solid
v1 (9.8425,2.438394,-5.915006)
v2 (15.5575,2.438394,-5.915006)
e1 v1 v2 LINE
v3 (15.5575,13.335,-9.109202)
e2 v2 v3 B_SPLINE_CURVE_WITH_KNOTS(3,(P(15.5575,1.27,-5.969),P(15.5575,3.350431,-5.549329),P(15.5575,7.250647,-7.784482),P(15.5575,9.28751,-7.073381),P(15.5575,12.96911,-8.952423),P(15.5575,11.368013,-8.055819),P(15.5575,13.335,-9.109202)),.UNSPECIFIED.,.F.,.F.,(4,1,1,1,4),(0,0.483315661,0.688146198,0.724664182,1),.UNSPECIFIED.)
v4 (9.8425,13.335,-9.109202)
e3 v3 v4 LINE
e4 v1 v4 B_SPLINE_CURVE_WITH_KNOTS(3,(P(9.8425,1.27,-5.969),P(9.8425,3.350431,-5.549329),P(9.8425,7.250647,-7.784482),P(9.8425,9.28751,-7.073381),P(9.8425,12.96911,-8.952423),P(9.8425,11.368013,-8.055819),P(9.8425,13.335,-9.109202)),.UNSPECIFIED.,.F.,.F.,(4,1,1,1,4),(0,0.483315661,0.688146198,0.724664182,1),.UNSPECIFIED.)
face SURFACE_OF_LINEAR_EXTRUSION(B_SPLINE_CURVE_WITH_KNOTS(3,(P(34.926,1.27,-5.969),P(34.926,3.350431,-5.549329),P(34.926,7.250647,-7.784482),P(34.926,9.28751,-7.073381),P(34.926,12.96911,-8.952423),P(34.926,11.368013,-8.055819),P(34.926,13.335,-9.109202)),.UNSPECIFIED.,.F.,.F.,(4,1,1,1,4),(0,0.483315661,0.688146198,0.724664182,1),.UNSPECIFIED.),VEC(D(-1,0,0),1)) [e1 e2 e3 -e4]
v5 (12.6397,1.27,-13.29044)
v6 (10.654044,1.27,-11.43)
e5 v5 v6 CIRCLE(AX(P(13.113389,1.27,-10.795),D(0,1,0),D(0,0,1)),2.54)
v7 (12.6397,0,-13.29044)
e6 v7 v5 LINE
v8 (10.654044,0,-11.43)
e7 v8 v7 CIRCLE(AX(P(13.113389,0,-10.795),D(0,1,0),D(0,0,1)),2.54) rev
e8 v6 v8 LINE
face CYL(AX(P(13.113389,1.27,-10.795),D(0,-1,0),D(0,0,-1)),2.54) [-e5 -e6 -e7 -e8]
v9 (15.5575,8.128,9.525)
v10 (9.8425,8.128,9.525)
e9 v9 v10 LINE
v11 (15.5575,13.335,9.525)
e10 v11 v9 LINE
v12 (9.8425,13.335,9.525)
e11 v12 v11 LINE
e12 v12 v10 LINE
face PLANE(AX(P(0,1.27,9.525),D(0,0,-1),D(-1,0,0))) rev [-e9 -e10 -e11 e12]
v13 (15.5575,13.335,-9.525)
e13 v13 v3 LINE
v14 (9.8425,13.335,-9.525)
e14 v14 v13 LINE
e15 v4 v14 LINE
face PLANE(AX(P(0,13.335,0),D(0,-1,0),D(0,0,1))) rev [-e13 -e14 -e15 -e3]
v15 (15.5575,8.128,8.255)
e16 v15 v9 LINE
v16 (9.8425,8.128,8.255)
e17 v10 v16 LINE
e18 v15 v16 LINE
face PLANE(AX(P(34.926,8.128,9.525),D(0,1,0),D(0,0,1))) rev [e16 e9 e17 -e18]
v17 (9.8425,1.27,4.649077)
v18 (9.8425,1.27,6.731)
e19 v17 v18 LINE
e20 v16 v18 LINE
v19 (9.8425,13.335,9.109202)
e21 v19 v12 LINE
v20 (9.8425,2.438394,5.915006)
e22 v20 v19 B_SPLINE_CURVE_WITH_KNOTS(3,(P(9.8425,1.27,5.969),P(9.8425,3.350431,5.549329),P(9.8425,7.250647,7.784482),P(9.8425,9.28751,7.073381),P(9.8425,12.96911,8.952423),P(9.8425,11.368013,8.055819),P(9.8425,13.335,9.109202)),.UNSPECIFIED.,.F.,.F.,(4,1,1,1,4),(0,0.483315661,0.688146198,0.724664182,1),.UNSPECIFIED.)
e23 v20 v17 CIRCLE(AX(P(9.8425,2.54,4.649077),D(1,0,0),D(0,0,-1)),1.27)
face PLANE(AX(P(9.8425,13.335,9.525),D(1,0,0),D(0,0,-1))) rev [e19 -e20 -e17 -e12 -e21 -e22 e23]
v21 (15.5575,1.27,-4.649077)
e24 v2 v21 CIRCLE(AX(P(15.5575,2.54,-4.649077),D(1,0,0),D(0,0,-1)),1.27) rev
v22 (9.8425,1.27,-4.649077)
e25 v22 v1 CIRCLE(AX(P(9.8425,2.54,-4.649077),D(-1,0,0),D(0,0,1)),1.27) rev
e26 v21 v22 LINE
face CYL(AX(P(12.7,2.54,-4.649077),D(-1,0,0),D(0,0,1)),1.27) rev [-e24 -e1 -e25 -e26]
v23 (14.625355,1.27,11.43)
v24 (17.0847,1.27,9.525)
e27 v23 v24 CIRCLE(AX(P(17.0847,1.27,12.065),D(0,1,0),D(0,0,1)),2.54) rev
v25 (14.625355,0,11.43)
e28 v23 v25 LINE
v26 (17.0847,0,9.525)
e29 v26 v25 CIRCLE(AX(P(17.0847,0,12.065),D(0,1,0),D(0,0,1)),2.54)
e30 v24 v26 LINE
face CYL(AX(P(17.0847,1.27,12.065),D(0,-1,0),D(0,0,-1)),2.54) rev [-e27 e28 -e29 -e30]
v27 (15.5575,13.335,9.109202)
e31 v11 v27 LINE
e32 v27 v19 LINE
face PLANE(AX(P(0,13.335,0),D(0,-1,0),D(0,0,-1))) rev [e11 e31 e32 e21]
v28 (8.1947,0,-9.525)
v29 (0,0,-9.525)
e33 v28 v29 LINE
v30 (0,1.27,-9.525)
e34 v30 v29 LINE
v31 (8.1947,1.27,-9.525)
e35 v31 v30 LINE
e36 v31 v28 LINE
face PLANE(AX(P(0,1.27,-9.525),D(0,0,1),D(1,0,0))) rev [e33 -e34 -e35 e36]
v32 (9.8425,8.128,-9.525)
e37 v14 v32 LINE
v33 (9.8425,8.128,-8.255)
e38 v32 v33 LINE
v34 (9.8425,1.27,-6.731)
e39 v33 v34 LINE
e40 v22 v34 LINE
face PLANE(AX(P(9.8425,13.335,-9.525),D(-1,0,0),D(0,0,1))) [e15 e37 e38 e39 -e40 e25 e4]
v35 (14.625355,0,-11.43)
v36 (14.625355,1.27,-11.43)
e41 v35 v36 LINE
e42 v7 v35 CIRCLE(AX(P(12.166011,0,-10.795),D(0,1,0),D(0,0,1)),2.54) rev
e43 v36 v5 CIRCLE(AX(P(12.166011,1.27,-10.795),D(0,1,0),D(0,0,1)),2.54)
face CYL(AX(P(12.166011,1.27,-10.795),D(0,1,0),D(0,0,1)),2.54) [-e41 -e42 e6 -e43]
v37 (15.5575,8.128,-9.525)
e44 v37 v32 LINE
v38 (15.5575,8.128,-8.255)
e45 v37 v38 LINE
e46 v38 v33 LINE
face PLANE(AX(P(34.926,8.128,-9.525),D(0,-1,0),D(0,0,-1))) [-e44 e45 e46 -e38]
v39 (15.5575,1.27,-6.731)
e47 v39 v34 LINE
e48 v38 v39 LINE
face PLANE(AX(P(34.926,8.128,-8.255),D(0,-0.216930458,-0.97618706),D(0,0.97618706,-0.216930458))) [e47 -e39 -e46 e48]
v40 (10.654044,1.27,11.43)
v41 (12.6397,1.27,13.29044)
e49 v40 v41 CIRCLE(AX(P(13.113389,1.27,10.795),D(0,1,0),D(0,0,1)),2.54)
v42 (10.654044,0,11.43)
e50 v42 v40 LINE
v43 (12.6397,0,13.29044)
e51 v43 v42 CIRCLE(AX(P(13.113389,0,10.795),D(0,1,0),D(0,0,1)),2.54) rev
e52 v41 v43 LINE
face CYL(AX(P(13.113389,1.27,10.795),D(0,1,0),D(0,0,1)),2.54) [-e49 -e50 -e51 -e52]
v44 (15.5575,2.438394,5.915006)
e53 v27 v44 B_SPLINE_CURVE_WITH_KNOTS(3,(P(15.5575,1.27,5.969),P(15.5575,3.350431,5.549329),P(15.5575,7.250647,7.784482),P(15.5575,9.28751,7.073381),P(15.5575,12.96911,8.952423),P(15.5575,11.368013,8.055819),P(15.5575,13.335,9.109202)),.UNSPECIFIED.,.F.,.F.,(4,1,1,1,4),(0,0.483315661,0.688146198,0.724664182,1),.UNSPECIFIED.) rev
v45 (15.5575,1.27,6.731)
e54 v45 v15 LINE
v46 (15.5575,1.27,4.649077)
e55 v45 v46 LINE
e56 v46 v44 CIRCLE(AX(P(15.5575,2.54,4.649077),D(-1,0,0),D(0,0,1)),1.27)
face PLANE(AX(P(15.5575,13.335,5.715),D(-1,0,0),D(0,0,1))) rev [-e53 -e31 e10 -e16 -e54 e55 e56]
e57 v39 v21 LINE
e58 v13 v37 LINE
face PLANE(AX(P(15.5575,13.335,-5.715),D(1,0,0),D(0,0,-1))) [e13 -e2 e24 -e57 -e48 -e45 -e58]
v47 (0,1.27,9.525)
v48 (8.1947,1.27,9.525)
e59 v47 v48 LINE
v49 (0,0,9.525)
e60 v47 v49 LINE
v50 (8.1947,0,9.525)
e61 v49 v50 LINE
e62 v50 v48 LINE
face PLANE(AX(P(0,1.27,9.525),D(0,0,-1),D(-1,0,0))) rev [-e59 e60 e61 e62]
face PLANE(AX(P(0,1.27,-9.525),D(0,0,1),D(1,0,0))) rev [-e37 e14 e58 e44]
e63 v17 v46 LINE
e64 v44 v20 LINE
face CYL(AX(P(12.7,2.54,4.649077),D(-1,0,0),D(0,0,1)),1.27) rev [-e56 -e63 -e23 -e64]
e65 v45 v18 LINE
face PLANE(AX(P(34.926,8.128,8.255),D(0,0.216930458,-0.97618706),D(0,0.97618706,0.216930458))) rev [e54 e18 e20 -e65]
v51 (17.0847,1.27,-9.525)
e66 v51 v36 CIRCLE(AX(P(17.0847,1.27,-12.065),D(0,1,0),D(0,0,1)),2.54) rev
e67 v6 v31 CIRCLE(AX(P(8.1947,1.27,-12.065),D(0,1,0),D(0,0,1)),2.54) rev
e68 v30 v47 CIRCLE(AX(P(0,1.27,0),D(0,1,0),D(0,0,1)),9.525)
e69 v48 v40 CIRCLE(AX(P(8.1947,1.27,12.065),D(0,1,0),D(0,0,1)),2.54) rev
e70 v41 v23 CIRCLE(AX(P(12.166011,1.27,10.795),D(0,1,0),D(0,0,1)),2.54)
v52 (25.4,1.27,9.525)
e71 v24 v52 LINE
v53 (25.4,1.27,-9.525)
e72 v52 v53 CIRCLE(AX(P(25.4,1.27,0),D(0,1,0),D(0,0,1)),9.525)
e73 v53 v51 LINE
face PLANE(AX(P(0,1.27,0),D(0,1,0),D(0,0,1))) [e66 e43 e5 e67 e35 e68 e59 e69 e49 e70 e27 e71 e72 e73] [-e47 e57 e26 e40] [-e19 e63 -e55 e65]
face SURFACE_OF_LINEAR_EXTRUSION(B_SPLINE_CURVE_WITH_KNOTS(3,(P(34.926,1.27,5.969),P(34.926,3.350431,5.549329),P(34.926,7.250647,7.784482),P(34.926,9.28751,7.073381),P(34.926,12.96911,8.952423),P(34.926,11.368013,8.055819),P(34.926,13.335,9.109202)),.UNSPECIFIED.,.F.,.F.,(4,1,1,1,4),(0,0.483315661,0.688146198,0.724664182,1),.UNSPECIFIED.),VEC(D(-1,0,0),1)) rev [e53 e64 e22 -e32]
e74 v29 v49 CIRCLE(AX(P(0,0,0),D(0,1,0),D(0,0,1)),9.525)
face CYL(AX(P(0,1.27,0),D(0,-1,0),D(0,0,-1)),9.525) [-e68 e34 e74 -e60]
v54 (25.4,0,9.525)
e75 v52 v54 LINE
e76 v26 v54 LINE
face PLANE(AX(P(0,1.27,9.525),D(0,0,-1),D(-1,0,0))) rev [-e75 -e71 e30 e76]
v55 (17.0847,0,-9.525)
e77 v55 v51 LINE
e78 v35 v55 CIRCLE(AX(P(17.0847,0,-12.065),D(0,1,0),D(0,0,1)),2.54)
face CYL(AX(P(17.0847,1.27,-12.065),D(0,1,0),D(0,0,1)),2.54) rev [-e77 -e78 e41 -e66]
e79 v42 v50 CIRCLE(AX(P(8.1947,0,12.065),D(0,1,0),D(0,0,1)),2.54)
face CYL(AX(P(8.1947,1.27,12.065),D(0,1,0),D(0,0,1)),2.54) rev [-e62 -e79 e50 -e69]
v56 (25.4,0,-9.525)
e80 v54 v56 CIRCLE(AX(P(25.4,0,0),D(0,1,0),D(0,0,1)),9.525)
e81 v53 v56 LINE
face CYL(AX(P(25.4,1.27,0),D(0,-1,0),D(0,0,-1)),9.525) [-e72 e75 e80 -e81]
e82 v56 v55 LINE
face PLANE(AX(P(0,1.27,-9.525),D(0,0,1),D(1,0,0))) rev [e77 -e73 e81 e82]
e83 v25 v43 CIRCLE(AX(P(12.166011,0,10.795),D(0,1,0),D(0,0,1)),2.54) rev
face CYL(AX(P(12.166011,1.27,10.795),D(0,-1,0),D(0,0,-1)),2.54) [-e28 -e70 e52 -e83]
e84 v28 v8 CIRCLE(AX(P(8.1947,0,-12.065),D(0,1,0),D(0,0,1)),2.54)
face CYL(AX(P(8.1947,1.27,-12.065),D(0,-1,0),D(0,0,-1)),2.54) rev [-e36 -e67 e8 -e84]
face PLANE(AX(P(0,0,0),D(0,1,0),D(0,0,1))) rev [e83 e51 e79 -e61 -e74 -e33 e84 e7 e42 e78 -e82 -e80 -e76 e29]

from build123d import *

# Parameters (mm, degrees)
BOSS_EXTRUDE1_DEPTH = 1.27
SKETCH2_W           = 5.715
SKETCH2_H           = 3.81
BOSS_EXTRUDE2_DEPTH = 12.065
CUT_EXTRUDE1_REACH  = 31.961
SKETCH5_W           = 3.81
SKETCH5_H           = 1.27
BOSS_EXTRUDE3_DEPTH = 3.81
FILLET1_R           = 1.27
FILLET2_R           = 2.54
FILLET3_R           = 2.54


with BuildPart() as part:
    # Sketch1 → Boss-Extrude1 (new body)
    with BuildSketch(Plane(origin=(0, 0, 0), x_dir=(1, 0, 0), z_dir=(0, 1, 0))):
        with BuildLine():
            Line((0, 9.525), (25.4, 9.525))
            ThreePointArc((25.4, 9.525), (34.925, 0), (25.4, -9.525))
            Line((25.4, -9.525), (0, -9.525))
            ThreePointArc((0, -9.525), (-9.525, 0), (0, 9.525))
        make_face()
    extrude(amount=BOSS_EXTRUDE1_DEPTH)

    # Sketch2 → Boss-Extrude2 (add)
    with BuildSketch(Plane(origin=(0, 1.27, 0), x_dir=(1, 0, 0), z_dir=(0, 1, 0))):
        with Locations((12.7, -7.62)):
            Rectangle(SKETCH2_W, SKETCH2_H)
    boss_extrude2 = extrude(amount=BOSS_EXTRUDE2_DEPTH)

    # Sketch3 → Cut-Extrude1 (cut, up to next)
    with BuildSketch(Plane.ZY.offset(-9.8425), mode=Mode.PRIVATE) as cut_extrude1_sk1:
        with BuildLine():
            Line((9.109202439, 13.335), (5.715, 13.335))
            Line((5.715, 13.335), (5.715, 1.27))
            Line((5.715, 1.27), (5.969, 1.27))
            add(Edge.make_bspline(
                [(5.969, 1.27), (5.549329098, 3.350430894), (7.78448223, 7.25064686), (7.073380845, 9.287510022), (8.952423462, 12.969109679), (8.055818696, 11.368012808), (9.109202439, 13.335)],
                knots=[0, 0, 0, 0, 0.483315661, 0.688146198, 0.724664182, 1, 1, 1, 1], degree=3))
        make_face()
    cut_extrude1_tool1 = extrude(cut_extrude1_sk1.sketch, amount=-CUT_EXTRUDE1_REACH, mode=Mode.PRIVATE) & part.part
    # Sketch3 → Cut-Extrude1 (cut, up to next)
    with BuildSketch(Plane.ZY.offset(-9.8425), mode=Mode.PRIVATE) as cut_extrude1_sk2:
        Polygon((9.525, 1.27), (9.525, 8.128), (8.255, 8.128), (6.731, 1.27), align=None)
    cut_extrude1_tool2 = extrude(cut_extrude1_sk2.sketch, amount=-CUT_EXTRUDE1_REACH, mode=Mode.PRIVATE) & part.part
    cut_extrude1_1 = cut_extrude1_tool1.solids().sort_by_distance((9.8425, 9.500256, 6.699344))[0]
    add(cut_extrude1_1, mode=Mode.SUBTRACT)
    cut_extrude1_2 = cut_extrude1_tool2.solids().sort_by_distance((9.8425, 4.270375, 8.461375))[0]
    add(cut_extrude1_2, mode=Mode.SUBTRACT)
    cut_extrude1 = cut_extrude1_1 + cut_extrude1_2  # Cut-Extrude1 as one shape, for the pattern or mirror that repeats it

    # Mirror1: Boss-Extrude2, Cut-Extrude1 across plane
    add(boss_extrude2.mirror(Plane.XY))
    add(cut_extrude1.mirror(Plane.XY), mode=Mode.SUBTRACT)

    # Sketch5 → Boss-Extrude3 (add)
    with BuildSketch(Plane.XY.offset(9.525)):
        with Locations((12.639699769, 0.635)):
            Rectangle(SKETCH5_W, SKETCH5_H)
    boss_extrude3 = extrude(amount=BOSS_EXTRUDE3_DEPTH)

    # Fillet1
    fillet1_edges = [part.edges().sort_by_distance(p)[0] for p in [
        (12.7, 1.27, 5.969),
        (12.7, 1.27, -5.969),
    ]]
    fillet(fillet1_edges, radius=FILLET1_R)

    # Mirror4: Boss-Extrude3 across plane
    add(boss_extrude3.mirror(Plane.XY))

    # Fillet2
    fillet2_edges = [part.edges().sort_by_distance(p)[0] for p in [
        (14.544699769, 0.635, -9.525),
        (10.734699769, 0.635, -9.525),
        (14.544699769, 0.635, 9.525),
        (10.734699769, 0.635, 9.525),
    ]]
    fillet(fillet2_edges, radius=FILLET2_R)

    # Fillet3
    # the kernel refuses this fillet: 2.54 mm, written as the material it takes off along each edge
    with BuildSketch(Plane(origin=(14.544699769, 7.216722124, 13.335), x_dir=(-1, 0, 0), z_dir=(0, -1, 0))) as fillet3_piece_1:
        with BuildLine():
            CenterArc((2.37868885, 2.54), FILLET3_R, 194.477512186, 75.522487814)
            Line((-0.080655575, 1.905), (-0.326590018, 1.8415))
            ThreePointArc((-0.326590018, 1.8415), (-0.254, 1.27), (-0.254, 0))
            Line((-0.254, 0), (0, -0.254))
            Line((0, -0.254), (2.37868885, -0.254))
            Line((2.37868885, -0.254), (2.37868885, 0))
        make_face()
    extrude(amount=13.163444248, mode=Mode.SUBTRACT)
    with BuildSketch(Plane(origin=(10.734699769, -5.946722124, 13.335), x_dir=(-0.04230098759681092, 0, -0.9991049126334703), z_dir=(0, 1, 0))) as fillet3_piece_2:
        with BuildLine():
            CenterArc((2.437105591, -2.484004224), FILLET3_R, 102.053120737, 75.522487814)
            Line((-0.100620888, -2.376559715), (-0.354393535, -2.365815264))
            Line((-0.354393535, -2.365815264), (-0.253772648, 0.010744451))
            Line((-0.253772648, 0.010744451), (0.010744451, 0.253772648))
            ThreePointArc((0.010744451, 0.253772648), (1.27960769, 0.200050394), (1.853666777, 0.248400422))
            Line((1.853666777, 0.248400422), (1.906706669, 0))
        make_face()
    extrude(amount=13.163444248, mode=Mode.SUBTRACT)
    with BuildSketch(Plane(origin=(14.544699769, 7.216722124, -13.335), x_dir=(-1, 0, 0), z_dir=(0, -1, 0))) as fillet3_piece_3:
        with BuildLine():
            CenterArc((2.37868885, -2.54), FILLET3_R, 90, 75.522487814)
            Line((-0.080655575, -1.905), (-0.326590018, -1.8415))
            ThreePointArc((-0.326590018, -1.8415), (-0.254, -1.27), (-0.254, 0))
            Line((-0.254, 0), (0, 0.254))
            Line((0, 0.254), (2.37868885, 0.254))
            Line((2.37868885, 0.254), (2.37868885, 0))
        make_face()
    extrude(amount=13.163444248, mode=Mode.SUBTRACT)
    with BuildSketch(Plane(origin=(10.734699769, -5.946722124, -13.335), x_dir=(-0.04230098759681092, 0, 0.9991049126334703), z_dir=(0, 1, 0))) as fillet3_piece_4:
        with BuildLine():
            CenterArc((2.437105591, 2.484004224), FILLET3_R, 182.424391449, 75.522487814)
            Line((-0.100620888, 2.376559715), (-0.354393535, 2.365815264))
            Line((-0.354393535, 2.365815264), (-0.253772648, -0.010744451))
            Line((-0.253772648, -0.010744451), (0.010744451, -0.253772648))
            ThreePointArc((0.010744451, -0.253772648), (1.27960769, -0.200050394), (1.853666777, -0.248400422))
            Line((1.853666777, -0.248400422), (1.906706669, 0))
        make_face()
    extrude(amount=13.163444248, mode=Mode.SUBTRACT)


solid = part.part
